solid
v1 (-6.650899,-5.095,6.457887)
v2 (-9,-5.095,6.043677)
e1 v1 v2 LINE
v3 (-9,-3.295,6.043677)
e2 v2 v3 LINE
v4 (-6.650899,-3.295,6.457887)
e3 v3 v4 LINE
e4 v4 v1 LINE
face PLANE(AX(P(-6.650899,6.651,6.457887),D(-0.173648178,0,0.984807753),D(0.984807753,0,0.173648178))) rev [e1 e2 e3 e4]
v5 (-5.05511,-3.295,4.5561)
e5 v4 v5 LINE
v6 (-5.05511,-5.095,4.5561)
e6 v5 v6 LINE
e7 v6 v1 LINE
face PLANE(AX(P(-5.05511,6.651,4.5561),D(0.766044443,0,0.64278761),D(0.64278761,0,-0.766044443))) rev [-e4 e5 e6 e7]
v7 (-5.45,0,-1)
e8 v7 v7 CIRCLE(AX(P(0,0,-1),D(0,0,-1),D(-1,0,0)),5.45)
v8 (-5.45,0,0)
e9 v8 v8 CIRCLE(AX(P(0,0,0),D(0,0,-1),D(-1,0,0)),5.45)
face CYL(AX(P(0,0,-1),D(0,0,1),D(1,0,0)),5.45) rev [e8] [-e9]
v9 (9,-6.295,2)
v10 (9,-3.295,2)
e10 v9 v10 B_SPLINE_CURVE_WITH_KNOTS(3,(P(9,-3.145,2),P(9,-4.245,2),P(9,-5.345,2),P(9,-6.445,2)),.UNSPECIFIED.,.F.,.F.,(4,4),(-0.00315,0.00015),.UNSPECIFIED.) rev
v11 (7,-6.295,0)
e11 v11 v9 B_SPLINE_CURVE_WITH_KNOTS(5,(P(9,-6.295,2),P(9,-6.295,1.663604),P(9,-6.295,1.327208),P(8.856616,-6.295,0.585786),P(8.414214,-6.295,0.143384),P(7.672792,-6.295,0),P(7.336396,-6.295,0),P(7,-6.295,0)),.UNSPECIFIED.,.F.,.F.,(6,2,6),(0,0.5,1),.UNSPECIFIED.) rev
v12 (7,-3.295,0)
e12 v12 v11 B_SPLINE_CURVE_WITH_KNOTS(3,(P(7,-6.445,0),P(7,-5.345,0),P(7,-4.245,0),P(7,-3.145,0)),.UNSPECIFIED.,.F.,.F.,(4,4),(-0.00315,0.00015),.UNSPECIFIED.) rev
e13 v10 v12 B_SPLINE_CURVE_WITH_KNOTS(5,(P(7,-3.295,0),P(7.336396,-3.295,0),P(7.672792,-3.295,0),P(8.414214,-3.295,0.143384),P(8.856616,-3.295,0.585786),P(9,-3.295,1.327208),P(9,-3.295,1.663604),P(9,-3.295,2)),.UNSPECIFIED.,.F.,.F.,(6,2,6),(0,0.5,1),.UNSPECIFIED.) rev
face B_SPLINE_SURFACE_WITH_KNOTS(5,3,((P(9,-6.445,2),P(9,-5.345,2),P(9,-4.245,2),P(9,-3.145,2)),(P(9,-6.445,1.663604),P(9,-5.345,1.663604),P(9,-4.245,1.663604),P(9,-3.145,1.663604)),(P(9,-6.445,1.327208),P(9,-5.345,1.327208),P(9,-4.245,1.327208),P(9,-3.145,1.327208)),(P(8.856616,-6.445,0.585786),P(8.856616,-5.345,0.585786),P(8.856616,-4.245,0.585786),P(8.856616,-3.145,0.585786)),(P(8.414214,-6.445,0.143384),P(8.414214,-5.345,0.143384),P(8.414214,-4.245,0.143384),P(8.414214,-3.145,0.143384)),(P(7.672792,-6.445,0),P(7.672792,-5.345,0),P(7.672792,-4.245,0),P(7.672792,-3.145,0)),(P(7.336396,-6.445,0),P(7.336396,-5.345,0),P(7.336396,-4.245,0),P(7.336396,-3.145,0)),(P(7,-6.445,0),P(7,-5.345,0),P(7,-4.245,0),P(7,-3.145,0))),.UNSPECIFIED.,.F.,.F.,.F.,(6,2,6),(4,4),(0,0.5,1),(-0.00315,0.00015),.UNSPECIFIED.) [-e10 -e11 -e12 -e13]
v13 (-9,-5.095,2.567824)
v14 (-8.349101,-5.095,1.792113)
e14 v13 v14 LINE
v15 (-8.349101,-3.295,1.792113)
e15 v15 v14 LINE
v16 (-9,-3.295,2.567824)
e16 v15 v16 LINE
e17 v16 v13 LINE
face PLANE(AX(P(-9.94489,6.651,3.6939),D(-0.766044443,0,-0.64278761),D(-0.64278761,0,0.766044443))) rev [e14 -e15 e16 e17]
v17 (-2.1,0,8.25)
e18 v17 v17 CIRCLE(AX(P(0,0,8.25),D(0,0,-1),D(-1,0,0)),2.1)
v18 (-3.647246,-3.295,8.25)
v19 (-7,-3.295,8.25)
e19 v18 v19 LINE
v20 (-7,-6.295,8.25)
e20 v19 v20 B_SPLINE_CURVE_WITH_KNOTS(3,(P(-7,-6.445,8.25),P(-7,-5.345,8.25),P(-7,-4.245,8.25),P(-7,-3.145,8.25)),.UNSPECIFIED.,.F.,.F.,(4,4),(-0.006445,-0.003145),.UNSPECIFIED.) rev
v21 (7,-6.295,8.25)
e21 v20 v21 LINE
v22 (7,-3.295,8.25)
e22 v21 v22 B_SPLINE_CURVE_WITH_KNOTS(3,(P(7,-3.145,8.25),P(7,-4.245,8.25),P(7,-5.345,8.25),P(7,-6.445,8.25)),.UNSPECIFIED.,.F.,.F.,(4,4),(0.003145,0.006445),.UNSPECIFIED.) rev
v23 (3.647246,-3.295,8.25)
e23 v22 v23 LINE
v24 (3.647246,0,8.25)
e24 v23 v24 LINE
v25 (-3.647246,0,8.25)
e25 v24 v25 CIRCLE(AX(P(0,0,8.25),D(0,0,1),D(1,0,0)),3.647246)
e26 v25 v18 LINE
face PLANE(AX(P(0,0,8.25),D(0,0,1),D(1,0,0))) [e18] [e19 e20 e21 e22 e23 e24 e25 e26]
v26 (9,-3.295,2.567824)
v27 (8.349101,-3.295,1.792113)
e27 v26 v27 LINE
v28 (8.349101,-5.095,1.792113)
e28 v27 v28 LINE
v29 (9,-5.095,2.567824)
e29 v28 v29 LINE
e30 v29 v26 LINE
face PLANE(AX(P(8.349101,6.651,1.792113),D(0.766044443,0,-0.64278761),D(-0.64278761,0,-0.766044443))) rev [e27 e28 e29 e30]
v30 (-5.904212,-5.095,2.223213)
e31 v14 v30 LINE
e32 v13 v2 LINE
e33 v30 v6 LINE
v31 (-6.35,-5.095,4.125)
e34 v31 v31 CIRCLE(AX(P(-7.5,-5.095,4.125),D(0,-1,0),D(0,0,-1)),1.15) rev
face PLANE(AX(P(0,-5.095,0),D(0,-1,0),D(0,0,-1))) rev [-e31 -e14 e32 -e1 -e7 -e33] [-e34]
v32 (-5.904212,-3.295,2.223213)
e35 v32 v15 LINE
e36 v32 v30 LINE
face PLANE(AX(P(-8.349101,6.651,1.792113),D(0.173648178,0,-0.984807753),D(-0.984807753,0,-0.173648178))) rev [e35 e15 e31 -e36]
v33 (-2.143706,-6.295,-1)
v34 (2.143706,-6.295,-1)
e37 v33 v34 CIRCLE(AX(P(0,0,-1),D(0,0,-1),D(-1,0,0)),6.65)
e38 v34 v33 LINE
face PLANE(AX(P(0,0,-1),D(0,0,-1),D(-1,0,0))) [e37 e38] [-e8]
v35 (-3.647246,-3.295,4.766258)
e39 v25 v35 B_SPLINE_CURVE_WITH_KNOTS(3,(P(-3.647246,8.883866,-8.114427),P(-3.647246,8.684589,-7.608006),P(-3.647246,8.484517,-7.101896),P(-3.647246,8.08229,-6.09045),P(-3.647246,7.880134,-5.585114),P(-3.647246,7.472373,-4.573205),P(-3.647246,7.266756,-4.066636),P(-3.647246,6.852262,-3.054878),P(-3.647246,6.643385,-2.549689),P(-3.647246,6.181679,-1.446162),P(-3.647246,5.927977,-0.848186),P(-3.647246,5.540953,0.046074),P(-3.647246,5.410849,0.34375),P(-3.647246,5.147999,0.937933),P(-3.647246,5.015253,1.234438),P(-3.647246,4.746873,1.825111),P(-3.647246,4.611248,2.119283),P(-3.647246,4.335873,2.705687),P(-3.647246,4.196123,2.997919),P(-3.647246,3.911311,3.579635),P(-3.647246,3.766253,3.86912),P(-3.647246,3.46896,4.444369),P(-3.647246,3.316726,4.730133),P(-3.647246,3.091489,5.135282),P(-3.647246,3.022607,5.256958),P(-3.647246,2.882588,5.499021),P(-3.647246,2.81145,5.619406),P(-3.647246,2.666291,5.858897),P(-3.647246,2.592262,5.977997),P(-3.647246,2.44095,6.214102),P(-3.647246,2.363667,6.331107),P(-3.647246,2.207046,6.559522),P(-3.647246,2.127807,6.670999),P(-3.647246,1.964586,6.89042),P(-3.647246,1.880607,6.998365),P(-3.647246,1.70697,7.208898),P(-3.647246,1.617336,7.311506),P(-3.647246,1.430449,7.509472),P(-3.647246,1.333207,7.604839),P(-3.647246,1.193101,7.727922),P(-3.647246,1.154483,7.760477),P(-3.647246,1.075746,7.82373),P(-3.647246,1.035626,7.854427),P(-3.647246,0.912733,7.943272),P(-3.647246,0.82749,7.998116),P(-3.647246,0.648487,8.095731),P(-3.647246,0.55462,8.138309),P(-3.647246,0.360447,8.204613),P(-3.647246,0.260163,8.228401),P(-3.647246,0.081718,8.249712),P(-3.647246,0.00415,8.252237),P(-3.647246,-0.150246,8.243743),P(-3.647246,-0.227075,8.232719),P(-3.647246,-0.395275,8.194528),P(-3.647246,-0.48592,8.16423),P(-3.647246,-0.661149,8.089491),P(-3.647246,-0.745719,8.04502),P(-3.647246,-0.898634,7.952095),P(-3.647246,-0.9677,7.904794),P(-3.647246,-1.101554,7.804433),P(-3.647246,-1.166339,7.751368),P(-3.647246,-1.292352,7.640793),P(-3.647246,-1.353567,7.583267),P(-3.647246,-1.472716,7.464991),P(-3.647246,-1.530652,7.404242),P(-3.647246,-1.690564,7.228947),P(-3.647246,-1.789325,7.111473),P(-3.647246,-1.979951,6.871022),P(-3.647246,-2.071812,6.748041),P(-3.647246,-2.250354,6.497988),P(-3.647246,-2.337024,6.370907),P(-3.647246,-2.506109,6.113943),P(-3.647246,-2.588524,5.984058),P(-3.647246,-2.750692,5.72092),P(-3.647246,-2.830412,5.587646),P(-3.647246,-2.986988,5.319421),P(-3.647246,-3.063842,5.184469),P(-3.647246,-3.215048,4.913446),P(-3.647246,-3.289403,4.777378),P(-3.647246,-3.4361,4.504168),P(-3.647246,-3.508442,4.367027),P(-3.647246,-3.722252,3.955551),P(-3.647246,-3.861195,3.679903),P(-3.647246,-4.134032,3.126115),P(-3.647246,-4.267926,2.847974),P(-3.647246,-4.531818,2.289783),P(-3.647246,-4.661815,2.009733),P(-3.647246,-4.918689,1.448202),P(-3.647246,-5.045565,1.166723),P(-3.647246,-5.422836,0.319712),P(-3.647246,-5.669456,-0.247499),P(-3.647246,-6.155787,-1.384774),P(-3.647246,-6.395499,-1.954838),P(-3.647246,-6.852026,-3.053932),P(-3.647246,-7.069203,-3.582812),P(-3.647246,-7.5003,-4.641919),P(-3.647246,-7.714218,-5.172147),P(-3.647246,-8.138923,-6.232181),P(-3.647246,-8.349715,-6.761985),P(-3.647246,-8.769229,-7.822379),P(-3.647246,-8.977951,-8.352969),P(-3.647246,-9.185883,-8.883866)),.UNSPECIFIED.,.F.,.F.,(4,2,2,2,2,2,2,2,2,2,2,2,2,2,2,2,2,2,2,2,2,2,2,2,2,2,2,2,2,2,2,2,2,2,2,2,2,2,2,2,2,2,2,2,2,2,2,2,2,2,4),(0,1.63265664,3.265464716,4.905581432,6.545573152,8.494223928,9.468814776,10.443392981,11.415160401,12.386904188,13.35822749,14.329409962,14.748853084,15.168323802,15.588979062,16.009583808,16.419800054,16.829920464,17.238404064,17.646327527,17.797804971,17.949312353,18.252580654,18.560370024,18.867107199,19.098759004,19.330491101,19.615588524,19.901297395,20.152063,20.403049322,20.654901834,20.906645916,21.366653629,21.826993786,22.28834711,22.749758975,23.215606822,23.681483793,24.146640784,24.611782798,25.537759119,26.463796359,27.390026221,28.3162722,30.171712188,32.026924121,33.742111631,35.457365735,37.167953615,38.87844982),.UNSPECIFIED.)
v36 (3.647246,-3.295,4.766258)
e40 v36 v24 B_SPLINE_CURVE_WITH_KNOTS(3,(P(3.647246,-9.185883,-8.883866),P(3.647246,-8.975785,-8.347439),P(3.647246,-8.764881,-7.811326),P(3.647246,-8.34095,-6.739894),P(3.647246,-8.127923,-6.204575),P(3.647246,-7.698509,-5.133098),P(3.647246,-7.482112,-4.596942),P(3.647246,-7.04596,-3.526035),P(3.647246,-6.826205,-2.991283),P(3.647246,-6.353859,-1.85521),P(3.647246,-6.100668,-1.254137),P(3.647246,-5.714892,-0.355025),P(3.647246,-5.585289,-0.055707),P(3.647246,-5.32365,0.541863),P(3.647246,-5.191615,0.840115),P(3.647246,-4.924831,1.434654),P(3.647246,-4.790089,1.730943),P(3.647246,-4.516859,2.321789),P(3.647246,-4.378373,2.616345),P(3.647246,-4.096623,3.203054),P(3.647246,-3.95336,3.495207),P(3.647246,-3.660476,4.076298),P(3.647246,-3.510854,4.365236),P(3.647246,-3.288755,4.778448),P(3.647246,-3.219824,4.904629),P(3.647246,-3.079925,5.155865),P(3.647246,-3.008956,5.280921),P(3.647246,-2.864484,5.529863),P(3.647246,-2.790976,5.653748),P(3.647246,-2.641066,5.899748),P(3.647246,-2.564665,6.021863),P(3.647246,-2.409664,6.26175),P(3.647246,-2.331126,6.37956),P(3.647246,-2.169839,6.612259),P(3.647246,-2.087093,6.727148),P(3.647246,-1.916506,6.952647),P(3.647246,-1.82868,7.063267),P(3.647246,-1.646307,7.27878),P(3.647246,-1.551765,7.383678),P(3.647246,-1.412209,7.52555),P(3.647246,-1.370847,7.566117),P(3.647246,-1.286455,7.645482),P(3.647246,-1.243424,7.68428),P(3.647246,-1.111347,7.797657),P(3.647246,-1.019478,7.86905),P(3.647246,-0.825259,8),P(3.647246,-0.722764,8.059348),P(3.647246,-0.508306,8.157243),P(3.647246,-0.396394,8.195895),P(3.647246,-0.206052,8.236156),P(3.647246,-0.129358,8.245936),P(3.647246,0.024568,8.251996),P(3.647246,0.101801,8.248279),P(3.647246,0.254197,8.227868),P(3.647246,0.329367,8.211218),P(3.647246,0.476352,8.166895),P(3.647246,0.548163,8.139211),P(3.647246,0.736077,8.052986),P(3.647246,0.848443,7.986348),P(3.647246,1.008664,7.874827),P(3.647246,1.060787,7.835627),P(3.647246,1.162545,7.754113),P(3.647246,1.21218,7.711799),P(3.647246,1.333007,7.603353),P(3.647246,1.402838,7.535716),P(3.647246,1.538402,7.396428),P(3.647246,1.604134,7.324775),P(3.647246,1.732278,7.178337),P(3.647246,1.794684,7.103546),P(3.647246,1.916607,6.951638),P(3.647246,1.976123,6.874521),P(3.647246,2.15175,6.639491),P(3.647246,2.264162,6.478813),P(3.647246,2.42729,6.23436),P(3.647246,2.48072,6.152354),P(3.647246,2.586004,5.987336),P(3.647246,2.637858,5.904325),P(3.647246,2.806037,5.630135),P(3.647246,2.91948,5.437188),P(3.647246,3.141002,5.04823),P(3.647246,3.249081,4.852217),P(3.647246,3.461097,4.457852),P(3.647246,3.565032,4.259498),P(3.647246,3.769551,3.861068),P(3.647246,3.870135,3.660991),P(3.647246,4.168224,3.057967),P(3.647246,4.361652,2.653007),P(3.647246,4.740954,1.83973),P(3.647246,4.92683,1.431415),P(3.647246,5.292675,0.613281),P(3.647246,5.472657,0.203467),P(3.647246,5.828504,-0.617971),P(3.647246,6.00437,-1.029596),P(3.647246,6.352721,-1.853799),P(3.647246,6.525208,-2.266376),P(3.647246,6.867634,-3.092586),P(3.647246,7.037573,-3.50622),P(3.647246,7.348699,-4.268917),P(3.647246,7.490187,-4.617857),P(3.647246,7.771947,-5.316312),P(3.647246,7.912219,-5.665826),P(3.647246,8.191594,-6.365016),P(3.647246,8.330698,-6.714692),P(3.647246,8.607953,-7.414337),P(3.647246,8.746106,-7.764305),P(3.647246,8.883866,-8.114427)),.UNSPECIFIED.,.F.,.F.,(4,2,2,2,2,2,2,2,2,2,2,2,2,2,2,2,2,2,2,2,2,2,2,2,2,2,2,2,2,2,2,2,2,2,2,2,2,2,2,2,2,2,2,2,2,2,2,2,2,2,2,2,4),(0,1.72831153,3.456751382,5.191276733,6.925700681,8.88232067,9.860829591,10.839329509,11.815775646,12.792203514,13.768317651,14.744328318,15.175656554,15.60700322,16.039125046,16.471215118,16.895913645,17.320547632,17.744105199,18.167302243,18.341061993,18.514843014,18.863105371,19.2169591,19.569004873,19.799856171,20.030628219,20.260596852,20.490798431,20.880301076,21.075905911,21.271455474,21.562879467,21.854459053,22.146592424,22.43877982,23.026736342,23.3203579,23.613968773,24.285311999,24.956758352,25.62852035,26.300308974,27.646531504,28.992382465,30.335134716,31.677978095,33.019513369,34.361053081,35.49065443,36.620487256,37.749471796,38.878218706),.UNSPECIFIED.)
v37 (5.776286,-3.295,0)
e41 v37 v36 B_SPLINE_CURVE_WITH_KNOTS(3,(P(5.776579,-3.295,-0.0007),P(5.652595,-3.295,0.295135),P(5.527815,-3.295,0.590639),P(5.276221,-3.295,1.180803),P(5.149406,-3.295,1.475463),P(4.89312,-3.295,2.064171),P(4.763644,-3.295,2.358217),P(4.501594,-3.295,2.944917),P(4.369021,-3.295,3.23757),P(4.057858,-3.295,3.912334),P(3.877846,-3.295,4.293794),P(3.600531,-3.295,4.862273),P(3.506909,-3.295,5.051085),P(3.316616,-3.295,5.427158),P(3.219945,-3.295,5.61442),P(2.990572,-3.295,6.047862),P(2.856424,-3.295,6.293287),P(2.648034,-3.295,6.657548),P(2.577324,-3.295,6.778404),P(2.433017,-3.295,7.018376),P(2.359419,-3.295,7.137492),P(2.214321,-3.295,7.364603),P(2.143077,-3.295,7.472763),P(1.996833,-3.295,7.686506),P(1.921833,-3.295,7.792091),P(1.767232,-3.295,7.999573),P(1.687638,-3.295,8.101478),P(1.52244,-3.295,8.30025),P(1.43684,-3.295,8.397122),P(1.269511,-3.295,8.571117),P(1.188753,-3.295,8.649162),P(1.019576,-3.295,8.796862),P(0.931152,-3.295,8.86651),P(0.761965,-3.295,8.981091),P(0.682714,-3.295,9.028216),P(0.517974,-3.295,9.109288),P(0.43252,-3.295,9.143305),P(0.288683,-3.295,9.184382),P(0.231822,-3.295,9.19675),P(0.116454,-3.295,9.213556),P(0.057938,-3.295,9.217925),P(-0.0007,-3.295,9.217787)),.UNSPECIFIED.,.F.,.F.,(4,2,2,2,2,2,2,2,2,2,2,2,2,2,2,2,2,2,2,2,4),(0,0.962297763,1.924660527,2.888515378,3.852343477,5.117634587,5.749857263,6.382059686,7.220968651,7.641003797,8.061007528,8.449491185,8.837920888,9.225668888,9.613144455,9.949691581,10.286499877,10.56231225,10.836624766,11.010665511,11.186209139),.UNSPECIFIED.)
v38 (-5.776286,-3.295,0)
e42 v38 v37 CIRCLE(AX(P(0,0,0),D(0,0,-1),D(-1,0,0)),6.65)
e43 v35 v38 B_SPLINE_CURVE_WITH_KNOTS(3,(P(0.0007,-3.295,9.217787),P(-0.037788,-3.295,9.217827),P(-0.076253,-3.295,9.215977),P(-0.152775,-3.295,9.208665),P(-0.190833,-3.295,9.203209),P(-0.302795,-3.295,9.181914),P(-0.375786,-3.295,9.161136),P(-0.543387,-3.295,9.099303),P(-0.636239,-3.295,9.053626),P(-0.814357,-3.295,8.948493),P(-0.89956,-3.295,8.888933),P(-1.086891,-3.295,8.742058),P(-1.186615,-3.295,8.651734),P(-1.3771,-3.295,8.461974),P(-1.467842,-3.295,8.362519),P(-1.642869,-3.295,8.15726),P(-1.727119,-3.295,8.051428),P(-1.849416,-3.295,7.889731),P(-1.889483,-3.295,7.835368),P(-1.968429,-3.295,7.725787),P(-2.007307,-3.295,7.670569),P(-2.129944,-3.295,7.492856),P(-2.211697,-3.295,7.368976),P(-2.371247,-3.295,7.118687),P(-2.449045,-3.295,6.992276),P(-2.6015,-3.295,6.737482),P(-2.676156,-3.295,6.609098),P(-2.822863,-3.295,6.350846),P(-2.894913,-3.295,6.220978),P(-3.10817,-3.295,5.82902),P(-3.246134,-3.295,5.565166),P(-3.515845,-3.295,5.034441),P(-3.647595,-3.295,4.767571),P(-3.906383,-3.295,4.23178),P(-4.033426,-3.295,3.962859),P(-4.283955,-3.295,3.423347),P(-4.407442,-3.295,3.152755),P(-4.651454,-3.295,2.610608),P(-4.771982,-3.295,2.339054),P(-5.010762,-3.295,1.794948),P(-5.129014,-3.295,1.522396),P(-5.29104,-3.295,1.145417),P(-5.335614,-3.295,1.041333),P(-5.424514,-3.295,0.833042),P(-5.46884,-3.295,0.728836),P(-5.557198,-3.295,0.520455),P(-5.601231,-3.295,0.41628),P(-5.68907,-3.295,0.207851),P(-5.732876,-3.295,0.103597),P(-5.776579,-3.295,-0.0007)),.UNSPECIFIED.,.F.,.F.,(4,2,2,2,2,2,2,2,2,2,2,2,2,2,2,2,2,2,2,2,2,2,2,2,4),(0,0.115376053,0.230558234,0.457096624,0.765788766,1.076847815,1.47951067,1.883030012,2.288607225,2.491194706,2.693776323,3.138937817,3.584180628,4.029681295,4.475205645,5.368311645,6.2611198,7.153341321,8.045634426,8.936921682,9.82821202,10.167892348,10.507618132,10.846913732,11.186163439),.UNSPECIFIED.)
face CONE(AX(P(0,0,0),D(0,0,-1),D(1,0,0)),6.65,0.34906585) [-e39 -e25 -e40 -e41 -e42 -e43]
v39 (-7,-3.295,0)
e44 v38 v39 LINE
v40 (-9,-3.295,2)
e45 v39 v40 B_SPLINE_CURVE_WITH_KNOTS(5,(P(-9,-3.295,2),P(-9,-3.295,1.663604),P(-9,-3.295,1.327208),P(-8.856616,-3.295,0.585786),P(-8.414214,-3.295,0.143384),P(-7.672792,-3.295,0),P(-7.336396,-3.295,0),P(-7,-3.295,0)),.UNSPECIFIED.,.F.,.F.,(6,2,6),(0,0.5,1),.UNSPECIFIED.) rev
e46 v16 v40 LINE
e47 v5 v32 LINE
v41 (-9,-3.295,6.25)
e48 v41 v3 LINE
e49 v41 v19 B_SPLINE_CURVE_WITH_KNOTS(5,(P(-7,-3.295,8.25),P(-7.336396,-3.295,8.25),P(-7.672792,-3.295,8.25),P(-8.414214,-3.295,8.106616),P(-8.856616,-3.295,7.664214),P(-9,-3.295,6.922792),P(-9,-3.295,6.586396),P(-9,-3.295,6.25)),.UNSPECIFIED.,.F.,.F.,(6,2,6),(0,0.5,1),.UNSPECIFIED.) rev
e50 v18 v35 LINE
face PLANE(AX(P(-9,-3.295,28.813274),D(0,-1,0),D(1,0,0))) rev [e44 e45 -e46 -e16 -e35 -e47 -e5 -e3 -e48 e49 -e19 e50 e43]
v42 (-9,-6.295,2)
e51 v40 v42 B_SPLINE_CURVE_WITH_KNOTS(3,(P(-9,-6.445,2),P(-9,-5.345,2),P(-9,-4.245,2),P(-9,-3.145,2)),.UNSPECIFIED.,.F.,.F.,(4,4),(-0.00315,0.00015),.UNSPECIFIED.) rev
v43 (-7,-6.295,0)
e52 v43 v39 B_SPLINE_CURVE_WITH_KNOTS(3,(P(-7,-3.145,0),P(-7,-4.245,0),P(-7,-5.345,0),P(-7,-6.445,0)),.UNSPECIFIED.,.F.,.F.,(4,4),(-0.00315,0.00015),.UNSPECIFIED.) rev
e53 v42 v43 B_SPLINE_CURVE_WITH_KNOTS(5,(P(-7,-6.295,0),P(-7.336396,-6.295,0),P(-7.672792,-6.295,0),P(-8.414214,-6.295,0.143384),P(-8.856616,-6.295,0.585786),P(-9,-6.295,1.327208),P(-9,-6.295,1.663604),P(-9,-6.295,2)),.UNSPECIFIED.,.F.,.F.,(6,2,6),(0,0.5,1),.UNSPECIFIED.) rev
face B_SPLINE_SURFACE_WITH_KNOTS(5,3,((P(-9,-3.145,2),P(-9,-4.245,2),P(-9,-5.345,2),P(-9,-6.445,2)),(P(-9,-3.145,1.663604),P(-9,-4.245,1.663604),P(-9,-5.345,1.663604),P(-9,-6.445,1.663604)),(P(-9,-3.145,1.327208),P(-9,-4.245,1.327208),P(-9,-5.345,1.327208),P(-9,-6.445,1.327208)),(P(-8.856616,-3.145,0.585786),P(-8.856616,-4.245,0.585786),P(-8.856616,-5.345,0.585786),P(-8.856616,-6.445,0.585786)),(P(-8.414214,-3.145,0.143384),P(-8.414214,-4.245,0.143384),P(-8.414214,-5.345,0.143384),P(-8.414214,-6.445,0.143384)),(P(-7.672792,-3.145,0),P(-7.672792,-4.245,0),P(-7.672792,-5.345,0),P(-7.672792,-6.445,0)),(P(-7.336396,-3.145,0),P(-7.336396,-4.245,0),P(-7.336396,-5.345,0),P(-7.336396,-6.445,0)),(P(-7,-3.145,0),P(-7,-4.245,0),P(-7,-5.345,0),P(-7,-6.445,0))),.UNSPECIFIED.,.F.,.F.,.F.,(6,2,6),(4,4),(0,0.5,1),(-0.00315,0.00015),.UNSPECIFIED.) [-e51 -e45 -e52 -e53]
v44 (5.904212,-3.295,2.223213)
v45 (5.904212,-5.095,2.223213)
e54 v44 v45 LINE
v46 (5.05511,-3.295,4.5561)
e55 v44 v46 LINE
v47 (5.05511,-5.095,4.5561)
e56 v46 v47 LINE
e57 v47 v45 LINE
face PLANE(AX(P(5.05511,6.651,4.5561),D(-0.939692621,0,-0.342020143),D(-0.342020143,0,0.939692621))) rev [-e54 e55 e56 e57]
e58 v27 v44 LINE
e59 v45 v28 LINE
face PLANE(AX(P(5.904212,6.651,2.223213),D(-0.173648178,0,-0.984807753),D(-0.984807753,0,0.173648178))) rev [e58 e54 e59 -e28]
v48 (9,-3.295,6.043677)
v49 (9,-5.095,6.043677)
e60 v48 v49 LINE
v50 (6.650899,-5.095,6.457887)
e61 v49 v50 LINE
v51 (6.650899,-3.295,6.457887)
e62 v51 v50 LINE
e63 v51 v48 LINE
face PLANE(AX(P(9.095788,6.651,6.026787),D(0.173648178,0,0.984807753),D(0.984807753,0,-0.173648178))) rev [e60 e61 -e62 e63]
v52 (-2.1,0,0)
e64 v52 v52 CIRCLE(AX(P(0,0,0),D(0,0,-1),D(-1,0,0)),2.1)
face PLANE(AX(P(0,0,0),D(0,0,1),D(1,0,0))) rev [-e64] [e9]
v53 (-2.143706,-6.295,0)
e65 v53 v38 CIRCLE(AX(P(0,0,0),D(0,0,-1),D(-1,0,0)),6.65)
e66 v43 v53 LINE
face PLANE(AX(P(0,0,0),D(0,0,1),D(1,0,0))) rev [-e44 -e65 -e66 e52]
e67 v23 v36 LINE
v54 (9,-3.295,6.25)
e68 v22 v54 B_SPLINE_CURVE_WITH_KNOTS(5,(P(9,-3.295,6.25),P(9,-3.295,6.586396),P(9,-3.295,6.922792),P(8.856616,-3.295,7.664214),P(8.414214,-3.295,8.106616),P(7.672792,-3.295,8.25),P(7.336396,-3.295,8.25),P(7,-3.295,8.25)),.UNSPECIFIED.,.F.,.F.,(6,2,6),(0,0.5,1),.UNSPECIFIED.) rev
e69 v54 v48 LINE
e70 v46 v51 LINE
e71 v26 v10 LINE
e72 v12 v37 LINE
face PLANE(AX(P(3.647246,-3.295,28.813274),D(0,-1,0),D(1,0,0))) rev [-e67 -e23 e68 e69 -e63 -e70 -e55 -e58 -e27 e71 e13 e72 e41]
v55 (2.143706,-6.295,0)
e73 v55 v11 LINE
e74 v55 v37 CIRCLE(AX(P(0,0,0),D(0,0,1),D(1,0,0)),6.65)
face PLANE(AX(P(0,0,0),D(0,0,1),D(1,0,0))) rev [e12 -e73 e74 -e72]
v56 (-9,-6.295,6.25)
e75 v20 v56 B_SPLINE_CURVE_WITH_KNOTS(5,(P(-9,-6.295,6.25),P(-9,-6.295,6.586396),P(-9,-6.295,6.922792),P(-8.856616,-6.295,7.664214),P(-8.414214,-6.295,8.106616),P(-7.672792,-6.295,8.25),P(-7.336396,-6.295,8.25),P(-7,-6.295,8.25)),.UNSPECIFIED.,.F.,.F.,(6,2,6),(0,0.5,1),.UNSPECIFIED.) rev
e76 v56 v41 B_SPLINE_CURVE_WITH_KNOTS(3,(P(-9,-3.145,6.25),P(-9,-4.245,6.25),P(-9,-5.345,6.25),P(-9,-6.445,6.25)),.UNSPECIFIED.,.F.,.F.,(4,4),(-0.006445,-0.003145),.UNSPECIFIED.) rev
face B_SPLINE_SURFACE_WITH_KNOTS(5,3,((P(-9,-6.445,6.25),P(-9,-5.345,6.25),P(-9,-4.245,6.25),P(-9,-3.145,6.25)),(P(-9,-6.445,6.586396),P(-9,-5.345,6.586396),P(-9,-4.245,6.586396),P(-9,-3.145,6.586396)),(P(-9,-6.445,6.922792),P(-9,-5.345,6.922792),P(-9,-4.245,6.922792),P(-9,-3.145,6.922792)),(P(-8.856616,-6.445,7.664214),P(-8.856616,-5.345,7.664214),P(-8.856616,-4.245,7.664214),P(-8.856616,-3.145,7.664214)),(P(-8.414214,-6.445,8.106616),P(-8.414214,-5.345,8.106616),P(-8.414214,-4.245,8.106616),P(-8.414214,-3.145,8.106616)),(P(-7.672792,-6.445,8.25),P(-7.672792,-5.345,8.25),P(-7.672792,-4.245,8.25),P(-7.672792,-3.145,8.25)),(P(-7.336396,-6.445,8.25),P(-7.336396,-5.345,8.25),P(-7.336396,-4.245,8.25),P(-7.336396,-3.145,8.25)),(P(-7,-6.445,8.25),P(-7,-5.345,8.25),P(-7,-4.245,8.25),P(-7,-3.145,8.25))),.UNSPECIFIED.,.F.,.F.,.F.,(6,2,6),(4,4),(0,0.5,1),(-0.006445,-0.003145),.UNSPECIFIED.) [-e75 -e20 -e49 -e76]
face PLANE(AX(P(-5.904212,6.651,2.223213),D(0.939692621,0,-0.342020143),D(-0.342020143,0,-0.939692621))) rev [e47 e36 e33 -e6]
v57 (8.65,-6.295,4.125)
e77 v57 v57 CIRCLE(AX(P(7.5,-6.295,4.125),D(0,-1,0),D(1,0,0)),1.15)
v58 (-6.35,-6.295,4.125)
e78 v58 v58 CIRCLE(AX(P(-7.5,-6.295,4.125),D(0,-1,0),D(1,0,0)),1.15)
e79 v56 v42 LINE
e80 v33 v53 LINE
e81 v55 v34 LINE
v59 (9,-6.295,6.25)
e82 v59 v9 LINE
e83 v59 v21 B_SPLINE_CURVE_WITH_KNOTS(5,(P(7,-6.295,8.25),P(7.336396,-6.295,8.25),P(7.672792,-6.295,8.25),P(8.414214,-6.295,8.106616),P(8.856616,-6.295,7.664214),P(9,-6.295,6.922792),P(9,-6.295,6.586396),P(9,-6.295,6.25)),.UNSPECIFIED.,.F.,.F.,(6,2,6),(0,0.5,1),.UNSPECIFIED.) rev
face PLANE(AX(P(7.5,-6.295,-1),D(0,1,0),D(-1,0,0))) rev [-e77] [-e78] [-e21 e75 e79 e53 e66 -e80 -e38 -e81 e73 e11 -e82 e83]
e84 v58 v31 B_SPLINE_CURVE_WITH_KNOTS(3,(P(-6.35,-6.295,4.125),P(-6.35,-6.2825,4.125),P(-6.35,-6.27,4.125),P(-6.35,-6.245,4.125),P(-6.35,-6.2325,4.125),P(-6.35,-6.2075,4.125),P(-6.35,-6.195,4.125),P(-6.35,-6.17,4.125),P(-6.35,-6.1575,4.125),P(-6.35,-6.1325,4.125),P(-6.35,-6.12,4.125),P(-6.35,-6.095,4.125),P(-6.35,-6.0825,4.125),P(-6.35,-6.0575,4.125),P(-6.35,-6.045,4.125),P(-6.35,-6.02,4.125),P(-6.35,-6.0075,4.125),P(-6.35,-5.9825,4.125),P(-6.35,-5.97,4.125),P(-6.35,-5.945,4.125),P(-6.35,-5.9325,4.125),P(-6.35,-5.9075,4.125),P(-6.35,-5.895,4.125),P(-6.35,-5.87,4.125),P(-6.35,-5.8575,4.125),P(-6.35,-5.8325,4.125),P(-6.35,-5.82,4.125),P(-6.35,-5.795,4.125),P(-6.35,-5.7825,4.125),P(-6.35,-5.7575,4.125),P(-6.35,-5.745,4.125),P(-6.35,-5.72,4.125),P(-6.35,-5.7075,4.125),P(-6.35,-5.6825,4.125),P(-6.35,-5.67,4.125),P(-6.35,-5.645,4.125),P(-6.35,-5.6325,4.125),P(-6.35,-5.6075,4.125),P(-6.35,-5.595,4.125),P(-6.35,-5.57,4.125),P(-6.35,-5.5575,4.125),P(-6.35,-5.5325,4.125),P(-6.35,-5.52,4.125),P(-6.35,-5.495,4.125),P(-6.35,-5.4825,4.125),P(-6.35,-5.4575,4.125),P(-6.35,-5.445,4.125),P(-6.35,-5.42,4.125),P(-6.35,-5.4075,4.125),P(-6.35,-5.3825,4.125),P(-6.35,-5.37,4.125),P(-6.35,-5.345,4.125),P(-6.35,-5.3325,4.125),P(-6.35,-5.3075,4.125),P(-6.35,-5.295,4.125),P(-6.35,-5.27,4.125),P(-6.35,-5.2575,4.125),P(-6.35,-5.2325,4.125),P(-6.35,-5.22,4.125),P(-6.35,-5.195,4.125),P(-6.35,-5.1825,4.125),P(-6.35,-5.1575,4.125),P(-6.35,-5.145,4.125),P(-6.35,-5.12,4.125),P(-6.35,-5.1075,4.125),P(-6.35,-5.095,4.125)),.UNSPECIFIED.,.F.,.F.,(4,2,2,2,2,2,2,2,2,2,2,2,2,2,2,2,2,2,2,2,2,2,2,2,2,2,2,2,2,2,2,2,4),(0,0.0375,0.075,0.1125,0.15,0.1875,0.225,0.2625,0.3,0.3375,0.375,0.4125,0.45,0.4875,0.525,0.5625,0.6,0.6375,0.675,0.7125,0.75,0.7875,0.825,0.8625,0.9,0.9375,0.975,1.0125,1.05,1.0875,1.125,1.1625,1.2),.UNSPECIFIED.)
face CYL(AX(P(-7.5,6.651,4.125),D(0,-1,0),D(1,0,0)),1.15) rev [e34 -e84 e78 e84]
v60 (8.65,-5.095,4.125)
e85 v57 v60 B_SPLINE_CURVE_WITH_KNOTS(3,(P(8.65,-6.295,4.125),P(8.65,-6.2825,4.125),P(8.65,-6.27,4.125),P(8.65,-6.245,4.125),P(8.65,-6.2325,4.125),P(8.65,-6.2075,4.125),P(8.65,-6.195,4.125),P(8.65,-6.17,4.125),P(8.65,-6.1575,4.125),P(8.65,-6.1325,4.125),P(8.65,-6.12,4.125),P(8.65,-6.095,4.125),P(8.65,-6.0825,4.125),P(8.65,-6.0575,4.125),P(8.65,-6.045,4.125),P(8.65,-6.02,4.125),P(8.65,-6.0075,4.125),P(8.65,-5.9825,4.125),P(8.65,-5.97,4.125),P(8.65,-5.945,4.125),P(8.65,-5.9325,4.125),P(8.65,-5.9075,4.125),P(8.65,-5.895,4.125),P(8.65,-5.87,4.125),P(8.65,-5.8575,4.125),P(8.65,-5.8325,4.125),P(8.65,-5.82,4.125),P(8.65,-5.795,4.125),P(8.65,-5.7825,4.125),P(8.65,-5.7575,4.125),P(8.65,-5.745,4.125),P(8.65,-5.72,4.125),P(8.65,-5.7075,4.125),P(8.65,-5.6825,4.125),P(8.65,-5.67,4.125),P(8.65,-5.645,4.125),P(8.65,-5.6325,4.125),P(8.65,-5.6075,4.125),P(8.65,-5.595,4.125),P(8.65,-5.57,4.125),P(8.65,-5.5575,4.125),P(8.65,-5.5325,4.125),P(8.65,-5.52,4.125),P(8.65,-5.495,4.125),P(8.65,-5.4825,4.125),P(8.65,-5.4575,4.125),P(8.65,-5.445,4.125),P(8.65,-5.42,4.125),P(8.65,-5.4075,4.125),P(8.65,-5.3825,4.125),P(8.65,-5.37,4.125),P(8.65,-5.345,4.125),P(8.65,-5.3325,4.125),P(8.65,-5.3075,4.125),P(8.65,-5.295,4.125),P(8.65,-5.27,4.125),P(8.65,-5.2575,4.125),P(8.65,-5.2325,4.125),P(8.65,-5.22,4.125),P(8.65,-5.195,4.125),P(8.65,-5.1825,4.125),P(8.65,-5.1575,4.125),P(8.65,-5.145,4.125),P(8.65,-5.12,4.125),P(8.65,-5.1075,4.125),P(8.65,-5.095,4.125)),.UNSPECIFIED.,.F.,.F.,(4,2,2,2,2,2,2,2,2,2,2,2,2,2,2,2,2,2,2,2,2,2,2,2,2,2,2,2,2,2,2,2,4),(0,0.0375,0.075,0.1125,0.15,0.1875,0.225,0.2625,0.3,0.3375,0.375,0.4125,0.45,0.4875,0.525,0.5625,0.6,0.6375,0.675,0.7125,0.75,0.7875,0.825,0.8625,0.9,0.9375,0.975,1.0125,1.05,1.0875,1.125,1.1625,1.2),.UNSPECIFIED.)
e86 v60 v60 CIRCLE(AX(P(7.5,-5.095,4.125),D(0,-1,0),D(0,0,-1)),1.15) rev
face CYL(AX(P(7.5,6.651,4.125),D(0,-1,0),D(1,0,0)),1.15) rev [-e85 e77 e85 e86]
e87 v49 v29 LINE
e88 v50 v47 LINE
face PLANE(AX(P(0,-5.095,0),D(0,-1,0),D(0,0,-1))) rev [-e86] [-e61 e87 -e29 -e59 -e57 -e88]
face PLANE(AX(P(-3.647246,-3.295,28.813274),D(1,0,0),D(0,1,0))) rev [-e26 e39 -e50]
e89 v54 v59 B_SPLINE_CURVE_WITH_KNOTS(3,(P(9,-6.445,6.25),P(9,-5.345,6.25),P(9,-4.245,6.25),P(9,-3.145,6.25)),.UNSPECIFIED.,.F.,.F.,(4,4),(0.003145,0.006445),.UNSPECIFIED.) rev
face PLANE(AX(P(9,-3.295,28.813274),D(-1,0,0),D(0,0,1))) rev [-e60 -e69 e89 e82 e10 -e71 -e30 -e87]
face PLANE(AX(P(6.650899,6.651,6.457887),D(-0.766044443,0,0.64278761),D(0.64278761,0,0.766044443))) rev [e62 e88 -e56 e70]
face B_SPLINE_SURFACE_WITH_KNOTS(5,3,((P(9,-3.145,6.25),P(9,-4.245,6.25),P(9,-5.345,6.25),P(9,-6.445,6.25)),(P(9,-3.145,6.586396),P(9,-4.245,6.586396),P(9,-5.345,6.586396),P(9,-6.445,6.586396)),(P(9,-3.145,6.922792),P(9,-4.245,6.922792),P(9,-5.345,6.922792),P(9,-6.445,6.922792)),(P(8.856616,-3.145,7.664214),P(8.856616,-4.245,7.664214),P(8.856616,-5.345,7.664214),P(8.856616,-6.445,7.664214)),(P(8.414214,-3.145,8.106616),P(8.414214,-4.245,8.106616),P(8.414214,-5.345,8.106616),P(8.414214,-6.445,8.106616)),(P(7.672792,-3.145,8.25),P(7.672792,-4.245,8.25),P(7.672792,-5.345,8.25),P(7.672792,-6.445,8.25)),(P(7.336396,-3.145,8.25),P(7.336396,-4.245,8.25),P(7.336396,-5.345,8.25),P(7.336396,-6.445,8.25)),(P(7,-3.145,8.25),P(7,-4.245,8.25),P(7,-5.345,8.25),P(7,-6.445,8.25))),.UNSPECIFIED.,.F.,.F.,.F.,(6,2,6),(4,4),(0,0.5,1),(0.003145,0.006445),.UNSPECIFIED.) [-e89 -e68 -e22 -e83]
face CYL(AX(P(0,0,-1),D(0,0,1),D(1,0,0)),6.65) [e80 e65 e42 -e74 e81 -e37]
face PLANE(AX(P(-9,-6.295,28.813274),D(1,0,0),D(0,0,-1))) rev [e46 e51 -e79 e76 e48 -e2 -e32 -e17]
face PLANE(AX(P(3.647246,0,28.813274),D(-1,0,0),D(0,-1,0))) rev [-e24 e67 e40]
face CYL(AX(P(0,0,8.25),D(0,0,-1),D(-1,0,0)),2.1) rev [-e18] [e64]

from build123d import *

# Parameters (mm, degrees)
SKETCH1_R               = 6.65
BOSS_EXTRUDE1_DEPTH     = 8.25
BOSS_EXTRUDE1_TAPER     = 20
SKETCH2_R               = 6.65
SKETCH2_R_2             = 5.45
BOSS_EXTRUDE2_DEPTH     = 1
SKETCH3_R               = 2.1
CUT_EXTRUDE1_DEPTH      = 13.51029576
CUT_EXTRUDE2_DEPTH      = 13.51029576
CUT_EXTRUDE2_DEPTH_BACK = 13.51029576
SKETCH4_W               = 15
SKETCH4_H               = 5
SKETCH5_R               = 2.1
BOSS_EXTRUDE3_DEPTH     = 8.25
CUT_EXTRUDE3_REACH      = 20.994
CUT_EXTRUDE3_START      = -1.2
CUT_EXTRUDE4_REACH      = 19.794
SKETCH7_R               = 1.15
FILLET1_SIZE            = 2


with BuildPart() as part:
    # Sketch1 → Boss-Extrude1 (new body)
    with BuildSketch(Plane.XY):
        Circle(SKETCH1_R)
    extrude(amount=BOSS_EXTRUDE1_DEPTH, taper=BOSS_EXTRUDE1_TAPER)

    # Sketch2 → Boss-Extrude2 (add)
    with BuildSketch(Plane(origin=(0, 0, 0), x_dir=(-1, 0, 0), z_dir=(0, 0, -1))):
        Circle(SKETCH2_R)
        Circle(SKETCH2_R_2, mode=Mode.SUBTRACT)
    extrude(amount=BOSS_EXTRUDE2_DEPTH)

    # Sketch3 → Cut-Extrude1 (cut, through all)
    with BuildSketch(Plane(origin=(0, 0, 0), x_dir=(-1, 0, 0), z_dir=(0, 0, -1))):
        Circle(SKETCH3_R)
    extrude(amount=-CUT_EXTRUDE1_DEPTH, mode=Mode.SUBTRACT)

    # Sketch4 → Cut-Extrude2 (cut, two sides: drawn at the far end of the back side and taken through both)
    with BuildSketch(Plane.XY.offset(-CUT_EXTRUDE2_DEPTH_BACK)):
        with Locations((0, -8.795)):
            Rectangle(SKETCH4_W, SKETCH4_H)
    extrude(amount=CUT_EXTRUDE2_DEPTH + CUT_EXTRUDE2_DEPTH_BACK, mode=Mode.SUBTRACT)

    # Sketch5 → Boss-Extrude3 (add)
    with BuildSketch(Plane.XY):
        with BuildLine():
            Line((3.647245567, 0), (3.647245567, -3.295))
            Line((3.647245567, -3.295), (9, -3.295))
            Line((9, -3.295), (9, -6.295))
            Line((9, -6.295), (-9, -6.295))
            Line((-9, -6.295), (-9, -3.295))
            Line((-9, -3.295), (-3.647245567, -3.295))
            Line((-3.647245567, -3.295), (-3.647245567, 0))
            ThreePointArc((-3.647245567, 0), (0, 3.647245567), (3.647245567, 0))
        make_face()
        with Locations(Location((0, 0, 0), (0, 0, 180))):
            Circle(SKETCH5_R, mode=Mode.SUBTRACT)
    extrude(amount=BOSS_EXTRUDE3_DEPTH)

    # Sketch6 → Cut-Extrude3 (cut, up to next)
    with BuildSketch(Plane.XZ.offset(6.295).offset(CUT_EXTRUDE3_START), mode=Mode.PRIVATE) as cut_extrude3_sk1:
        Polygon((-6.650898686, 6.457886687), (-9.095788478, 6.026786651), (-9.944889792, 3.693899965), (-8.349101314, 1.792113313), (-5.904211522, 2.223213349), (-5.055110208, 4.556100035), align=None)
    cut_extrude3_tool1 = extrude(cut_extrude3_sk1.sketch, amount=-CUT_EXTRUDE3_REACH, mode=Mode.PRIVATE) & part.part
    # Sketch6 → Cut-Extrude3 (cut, up to next)
    with BuildSketch(Plane.XZ.offset(6.295).offset(CUT_EXTRUDE3_START), mode=Mode.PRIVATE) as cut_extrude3_sk2:
        Polygon((6.650898686, 6.457886687), (5.055110208, 4.556100035), (5.904211522, 2.223213349), (8.349101314, 1.792113313), (9.944889792, 3.693899965), (9.095788478, 6.026786651), align=None)
    cut_extrude3_tool2 = extrude(cut_extrude3_sk2.sketch, amount=-CUT_EXTRUDE3_REACH, mode=Mode.PRIVATE) & part.part
    add(cut_extrude3_tool1.solids().sort_by_distance((-7.5, -5.095, 4.125))[0], mode=Mode.SUBTRACT)
    add(cut_extrude3_tool2.solids().sort_by_distance((7.5, -5.095, 4.125))[0], mode=Mode.SUBTRACT)

    # Sketch7 → Cut-Extrude4 (cut, up to next)
    with BuildSketch(Plane.XZ.offset(6.295), mode=Mode.PRIVATE) as cut_extrude4_sk1:
        with Locations((7.5, 4.125)):
            Circle(SKETCH7_R)
    cut_extrude4_tool1 = extrude(cut_extrude4_sk1.sketch, amount=-CUT_EXTRUDE4_REACH, mode=Mode.PRIVATE) & part.part
    # Sketch7 → Cut-Extrude4 (cut, up to next)
    with BuildSketch(Plane.XZ.offset(6.295), mode=Mode.PRIVATE) as cut_extrude4_sk2:
        with Locations((-7.5, 4.125)):
            Circle(SKETCH7_R)
    cut_extrude4_tool2 = extrude(cut_extrude4_sk2.sketch, amount=-CUT_EXTRUDE4_REACH, mode=Mode.PRIVATE) & part.part
    add(cut_extrude4_tool1.solids().sort_by_distance((7.5, -6.295, 4.125))[0], mode=Mode.SUBTRACT)
    add(cut_extrude4_tool2.solids().sort_by_distance((-7.5, -6.295, 4.125))[0], mode=Mode.SUBTRACT)

    # Fillet1
    # a fillet whose section is not a circle: 2 mm, written as the material it takes off along each edge
    with BuildSketch(Plane(origin=(9, 1.705, 0), x_dir=(0, 0, 1), z_dir=(0, -1, 0)), Plane(origin=(9, 1.705, 8.25), x_dir=(-1, 0, 0), z_dir=(0, -1, 0)), Plane(origin=(-9, -11.295, 0), x_dir=(0, 0, 1), z_dir=(0, 1, 0)), Plane(origin=(-9, -11.295, 8.25), x_dir=(1, 0, 0), z_dir=(0, 1, 0))) as fillet1_piece_1:
        with BuildLine():
            add(Edge.make_bspline([(FILLET1_SIZE, 0), (FILLET1_SIZE * 0.831801948466, 0), (FILLET1_SIZE * 0.663603896932, 0), (FILLET1_SIZE * 0.292893218813, FILLET1_SIZE * 0.0716919198361), (FILLET1_SIZE * 0.0716919198361, FILLET1_SIZE * 0.292893218813), (0, FILLET1_SIZE * 0.663603896932), (0, FILLET1_SIZE * 0.831801948466), (0, FILLET1_SIZE)], knots=[0, 0, 0, 0, 0, 0, 0.5, 0.5, 1, 1, 1, 1, 1, 1], degree=5))
            Line((0, FILLET1_SIZE), (0, 0))
            Line((0, 0), (FILLET1_SIZE, 0))
        make_face()
    extrude(amount=13, mode=Mode.SUBTRACT)


solid = part.part
